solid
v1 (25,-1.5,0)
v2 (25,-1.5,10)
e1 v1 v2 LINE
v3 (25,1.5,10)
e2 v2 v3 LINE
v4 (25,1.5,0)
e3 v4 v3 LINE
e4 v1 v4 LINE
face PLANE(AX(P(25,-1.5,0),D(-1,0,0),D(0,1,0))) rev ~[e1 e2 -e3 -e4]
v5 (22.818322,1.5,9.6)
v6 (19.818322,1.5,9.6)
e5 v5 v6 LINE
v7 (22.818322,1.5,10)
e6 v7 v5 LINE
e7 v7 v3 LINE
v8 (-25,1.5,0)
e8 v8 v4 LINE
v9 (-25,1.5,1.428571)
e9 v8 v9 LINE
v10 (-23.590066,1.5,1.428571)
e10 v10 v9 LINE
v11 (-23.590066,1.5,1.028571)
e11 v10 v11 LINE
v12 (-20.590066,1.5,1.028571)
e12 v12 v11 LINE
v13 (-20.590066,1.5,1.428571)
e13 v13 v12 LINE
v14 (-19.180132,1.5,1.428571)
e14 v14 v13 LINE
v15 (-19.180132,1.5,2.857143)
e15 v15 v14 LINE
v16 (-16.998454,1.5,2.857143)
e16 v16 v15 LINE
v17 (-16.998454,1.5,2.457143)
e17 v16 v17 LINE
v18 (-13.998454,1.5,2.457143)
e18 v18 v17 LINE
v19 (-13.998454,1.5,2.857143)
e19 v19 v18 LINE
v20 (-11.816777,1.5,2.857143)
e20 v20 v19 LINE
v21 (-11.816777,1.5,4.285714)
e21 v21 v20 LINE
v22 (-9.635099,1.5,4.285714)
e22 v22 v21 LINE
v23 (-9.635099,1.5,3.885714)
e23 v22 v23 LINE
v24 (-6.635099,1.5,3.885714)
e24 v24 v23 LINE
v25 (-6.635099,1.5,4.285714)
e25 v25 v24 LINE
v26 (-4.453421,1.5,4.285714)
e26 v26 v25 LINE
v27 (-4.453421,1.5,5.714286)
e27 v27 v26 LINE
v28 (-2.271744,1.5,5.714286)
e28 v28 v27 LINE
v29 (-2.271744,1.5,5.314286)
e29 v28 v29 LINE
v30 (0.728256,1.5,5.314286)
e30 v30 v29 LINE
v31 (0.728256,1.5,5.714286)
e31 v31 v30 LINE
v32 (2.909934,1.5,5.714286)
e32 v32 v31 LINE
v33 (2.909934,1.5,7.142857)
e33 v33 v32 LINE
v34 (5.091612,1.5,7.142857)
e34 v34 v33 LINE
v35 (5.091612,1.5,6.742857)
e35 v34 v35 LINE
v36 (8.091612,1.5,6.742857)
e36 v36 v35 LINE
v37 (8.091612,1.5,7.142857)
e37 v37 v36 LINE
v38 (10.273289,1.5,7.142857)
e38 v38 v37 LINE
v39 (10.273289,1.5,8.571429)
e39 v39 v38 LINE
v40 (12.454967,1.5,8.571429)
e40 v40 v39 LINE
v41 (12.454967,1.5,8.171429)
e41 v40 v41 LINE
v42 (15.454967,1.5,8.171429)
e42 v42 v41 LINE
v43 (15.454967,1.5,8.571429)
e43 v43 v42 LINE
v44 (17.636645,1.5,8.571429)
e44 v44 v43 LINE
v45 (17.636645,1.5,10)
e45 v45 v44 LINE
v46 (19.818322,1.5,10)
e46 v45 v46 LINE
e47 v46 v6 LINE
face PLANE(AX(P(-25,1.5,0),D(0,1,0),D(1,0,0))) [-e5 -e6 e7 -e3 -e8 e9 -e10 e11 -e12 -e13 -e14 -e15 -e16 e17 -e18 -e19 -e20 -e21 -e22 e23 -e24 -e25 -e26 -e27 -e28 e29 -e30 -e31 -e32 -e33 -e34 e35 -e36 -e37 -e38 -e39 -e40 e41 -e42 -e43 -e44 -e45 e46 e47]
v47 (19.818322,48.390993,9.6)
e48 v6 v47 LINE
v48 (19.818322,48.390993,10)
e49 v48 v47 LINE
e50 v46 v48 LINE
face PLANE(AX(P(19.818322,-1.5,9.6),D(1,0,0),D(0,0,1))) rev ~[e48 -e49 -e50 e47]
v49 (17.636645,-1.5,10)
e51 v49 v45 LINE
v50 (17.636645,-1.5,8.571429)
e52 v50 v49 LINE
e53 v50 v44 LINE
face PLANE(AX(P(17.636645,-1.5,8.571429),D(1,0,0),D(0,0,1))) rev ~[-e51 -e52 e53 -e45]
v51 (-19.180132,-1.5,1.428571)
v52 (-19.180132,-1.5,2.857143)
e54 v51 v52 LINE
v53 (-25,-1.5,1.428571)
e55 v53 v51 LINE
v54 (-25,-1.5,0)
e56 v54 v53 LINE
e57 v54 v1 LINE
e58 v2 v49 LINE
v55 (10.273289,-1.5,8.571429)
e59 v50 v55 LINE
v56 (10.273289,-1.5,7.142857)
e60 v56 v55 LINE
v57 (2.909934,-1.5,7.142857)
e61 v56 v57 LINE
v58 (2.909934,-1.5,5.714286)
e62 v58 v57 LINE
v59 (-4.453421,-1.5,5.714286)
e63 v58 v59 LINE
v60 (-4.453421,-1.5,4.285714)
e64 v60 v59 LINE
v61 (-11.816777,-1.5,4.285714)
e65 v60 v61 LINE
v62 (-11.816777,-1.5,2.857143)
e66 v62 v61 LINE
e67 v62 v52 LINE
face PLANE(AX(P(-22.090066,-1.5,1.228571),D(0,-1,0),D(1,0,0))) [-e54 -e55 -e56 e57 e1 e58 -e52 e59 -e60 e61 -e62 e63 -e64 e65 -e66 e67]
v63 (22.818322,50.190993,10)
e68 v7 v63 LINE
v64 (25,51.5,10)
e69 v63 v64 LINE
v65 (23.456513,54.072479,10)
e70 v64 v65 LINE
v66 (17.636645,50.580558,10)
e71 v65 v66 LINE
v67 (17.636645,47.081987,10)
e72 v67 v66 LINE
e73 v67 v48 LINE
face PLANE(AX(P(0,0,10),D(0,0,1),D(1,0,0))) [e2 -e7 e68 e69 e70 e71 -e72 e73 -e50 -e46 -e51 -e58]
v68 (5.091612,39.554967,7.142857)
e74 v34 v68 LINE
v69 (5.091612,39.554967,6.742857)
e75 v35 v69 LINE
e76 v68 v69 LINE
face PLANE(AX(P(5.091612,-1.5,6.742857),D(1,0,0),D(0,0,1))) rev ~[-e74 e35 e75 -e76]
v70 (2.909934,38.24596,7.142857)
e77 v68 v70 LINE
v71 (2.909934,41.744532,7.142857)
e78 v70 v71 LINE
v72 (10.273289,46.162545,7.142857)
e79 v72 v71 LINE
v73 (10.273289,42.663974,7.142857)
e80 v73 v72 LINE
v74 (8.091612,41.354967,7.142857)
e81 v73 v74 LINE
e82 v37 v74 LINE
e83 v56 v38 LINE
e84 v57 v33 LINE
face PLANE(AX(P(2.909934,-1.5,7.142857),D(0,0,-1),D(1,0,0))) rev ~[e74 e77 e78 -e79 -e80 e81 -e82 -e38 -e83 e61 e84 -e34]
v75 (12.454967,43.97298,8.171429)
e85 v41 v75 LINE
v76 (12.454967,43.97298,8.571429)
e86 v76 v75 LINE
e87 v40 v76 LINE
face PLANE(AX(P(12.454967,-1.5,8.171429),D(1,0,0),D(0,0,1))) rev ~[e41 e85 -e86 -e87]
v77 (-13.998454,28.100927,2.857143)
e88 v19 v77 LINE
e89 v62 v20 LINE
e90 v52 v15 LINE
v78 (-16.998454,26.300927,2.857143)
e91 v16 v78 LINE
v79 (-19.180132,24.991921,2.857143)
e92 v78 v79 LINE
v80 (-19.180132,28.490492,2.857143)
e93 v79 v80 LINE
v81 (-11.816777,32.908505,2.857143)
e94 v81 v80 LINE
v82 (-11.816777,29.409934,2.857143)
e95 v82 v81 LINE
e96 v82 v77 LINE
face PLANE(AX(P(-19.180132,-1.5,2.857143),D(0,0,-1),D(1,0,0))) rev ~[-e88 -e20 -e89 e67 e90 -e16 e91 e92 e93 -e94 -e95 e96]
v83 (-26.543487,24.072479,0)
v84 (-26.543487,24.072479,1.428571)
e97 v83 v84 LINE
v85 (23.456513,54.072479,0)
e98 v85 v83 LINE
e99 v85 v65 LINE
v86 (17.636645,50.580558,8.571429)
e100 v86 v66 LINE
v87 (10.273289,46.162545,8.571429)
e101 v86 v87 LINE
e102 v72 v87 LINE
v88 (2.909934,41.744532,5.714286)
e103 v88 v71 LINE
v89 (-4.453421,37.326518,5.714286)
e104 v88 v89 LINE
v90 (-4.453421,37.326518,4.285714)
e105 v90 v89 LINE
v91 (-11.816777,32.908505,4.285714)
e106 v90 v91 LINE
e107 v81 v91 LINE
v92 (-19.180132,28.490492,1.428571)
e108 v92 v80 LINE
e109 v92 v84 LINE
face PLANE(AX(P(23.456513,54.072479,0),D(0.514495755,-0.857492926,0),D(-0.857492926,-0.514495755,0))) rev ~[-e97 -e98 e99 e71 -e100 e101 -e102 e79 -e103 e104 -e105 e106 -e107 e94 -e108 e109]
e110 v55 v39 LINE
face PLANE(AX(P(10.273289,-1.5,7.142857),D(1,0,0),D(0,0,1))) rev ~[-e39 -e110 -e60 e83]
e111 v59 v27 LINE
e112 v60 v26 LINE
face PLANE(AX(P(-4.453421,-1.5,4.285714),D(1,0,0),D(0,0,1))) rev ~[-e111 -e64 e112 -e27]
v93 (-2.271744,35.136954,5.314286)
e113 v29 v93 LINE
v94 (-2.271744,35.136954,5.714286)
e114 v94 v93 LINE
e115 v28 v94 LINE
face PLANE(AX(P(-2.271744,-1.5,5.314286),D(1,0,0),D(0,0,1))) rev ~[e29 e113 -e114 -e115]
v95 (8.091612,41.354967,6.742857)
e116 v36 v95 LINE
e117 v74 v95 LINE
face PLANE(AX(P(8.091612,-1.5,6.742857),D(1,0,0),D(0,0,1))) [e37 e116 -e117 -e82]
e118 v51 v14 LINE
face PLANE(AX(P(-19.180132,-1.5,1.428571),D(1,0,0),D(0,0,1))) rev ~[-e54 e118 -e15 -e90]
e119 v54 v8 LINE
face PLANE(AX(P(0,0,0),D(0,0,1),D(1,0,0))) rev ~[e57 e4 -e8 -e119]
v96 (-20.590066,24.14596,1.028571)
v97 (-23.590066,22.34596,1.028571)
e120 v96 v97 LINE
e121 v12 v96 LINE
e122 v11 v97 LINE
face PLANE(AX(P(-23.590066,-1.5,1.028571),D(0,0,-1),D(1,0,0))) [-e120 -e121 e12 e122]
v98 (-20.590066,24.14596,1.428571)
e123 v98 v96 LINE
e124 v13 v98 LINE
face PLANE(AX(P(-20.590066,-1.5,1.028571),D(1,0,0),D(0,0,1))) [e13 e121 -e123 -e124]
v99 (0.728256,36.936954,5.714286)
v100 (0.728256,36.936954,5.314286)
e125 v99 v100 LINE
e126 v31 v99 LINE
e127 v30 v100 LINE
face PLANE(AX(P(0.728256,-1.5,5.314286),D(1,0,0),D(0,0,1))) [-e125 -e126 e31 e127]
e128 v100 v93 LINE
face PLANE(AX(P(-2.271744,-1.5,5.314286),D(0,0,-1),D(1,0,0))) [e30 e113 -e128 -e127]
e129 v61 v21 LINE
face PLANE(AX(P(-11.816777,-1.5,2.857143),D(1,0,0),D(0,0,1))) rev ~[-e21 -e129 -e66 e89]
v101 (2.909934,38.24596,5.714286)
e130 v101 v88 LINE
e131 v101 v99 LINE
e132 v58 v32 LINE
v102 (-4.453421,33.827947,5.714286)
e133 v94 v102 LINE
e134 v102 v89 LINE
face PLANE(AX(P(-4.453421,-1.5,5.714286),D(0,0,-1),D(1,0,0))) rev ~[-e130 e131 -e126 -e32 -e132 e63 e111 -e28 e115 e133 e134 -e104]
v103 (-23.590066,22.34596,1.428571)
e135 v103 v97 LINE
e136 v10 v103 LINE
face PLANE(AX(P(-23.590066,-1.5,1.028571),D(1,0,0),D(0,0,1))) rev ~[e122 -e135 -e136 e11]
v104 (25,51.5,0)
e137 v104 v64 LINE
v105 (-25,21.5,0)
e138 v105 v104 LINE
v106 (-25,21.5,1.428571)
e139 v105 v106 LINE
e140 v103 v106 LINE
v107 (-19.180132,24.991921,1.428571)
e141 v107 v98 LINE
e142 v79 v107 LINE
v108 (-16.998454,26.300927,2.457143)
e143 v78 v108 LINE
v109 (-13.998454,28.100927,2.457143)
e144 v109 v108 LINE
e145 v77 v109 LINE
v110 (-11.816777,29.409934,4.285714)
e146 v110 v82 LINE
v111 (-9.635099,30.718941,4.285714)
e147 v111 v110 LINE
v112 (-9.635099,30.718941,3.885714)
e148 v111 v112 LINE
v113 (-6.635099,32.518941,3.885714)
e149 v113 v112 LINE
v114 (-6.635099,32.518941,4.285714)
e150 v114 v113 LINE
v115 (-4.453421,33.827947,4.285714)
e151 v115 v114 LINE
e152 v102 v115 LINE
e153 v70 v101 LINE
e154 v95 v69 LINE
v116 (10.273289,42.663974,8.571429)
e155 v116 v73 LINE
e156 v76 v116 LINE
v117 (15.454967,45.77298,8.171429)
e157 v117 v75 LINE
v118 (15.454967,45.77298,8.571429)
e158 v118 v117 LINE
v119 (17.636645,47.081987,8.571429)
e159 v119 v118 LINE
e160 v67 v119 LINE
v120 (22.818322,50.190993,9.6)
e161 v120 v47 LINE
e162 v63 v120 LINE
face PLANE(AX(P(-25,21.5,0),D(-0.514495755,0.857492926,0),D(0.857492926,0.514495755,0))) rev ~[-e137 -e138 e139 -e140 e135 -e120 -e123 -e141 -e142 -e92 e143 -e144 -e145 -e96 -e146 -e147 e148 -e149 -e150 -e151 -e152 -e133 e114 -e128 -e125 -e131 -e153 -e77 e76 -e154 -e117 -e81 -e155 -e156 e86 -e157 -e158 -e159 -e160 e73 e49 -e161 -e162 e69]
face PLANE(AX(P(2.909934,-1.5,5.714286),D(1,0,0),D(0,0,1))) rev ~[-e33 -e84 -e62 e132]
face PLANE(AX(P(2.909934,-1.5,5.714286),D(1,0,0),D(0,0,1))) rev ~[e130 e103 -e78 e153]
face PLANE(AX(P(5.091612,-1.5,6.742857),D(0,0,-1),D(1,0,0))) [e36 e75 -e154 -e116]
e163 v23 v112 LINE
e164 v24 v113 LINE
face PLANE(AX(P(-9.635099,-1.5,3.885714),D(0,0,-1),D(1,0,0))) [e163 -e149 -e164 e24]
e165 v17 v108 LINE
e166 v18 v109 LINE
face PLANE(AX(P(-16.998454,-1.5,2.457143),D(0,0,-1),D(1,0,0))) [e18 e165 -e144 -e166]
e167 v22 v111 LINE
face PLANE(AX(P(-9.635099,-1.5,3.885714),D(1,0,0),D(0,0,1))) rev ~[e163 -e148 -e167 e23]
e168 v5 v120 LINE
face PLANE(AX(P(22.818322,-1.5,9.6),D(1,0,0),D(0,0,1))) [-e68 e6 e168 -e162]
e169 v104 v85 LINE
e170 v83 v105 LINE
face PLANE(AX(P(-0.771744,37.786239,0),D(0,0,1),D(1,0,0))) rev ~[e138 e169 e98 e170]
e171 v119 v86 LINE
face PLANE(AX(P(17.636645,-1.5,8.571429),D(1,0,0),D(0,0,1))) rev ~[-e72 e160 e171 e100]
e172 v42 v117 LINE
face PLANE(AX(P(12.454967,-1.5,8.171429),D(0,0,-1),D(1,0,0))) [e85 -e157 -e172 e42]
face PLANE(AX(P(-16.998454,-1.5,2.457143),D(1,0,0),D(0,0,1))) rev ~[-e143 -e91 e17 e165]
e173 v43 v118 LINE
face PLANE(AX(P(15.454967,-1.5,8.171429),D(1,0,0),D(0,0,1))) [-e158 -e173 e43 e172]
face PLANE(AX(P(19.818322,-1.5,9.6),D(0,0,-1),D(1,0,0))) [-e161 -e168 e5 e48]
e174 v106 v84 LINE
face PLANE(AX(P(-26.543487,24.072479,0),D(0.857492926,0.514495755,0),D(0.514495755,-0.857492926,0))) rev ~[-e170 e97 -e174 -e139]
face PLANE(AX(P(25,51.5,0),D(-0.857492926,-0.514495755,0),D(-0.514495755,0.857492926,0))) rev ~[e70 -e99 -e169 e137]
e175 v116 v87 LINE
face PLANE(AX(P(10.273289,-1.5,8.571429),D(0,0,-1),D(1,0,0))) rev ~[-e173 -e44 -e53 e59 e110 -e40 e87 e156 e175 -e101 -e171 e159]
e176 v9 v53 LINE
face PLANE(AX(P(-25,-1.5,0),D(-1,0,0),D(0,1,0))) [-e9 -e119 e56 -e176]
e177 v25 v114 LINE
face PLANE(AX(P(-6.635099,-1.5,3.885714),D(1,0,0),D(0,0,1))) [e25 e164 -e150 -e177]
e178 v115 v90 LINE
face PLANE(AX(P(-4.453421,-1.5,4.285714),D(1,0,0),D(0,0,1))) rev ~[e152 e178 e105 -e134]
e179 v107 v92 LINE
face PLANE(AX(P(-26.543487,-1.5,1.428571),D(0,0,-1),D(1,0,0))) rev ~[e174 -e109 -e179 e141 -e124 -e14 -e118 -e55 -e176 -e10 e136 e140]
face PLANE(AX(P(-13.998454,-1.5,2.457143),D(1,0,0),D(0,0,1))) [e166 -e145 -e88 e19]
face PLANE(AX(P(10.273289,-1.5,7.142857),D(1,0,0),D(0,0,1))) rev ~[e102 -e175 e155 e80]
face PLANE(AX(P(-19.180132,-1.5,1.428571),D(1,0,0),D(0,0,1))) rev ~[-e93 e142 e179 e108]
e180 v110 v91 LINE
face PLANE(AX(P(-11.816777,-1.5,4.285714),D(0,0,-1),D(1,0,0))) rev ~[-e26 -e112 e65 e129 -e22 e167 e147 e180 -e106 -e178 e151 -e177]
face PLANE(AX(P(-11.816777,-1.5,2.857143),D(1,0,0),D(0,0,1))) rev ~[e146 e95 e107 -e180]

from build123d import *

# Parameters (mm, degrees)
F0_W     = 50
F0_H     = 3
F1_DEPTH = 10
F3_DEPTH = 55.5734787771
F4_W     = 3
F4_H     = 0.4
F5_REACH = 58.6000279672


with BuildPart() as f1:
    # F0 (on Top) → F1 (new body)
    with BuildSketch(Plane.XY):
        Rectangle(F0_W, F0_H)
    extrude(amount=F1_DEPTH)


with BuildPart() as f1b:
    # F0 (on Top) → F1, piece 2 (new body)
    with BuildSketch(Plane.XY):
        Polygon((-26.5434872663, 24.0724787771), (-25, 21.5), (25, 51.5), (23.4565127337, 54.0724787771), align=None)
    extrude(amount=F1_DEPTH)


with BuildPart() as f3_tool:
    # F2 (on face) → F3 (new body, through all)
    with BuildSketch(Plane.XZ.offset(1.5)):
        Polygon((17.6366446762, 10), (-26.5434872663, 10), (-26.5434872663, 1.4285714286), (-19.1801319425, 1.4285714286), (-19.1801319425, 2.8571428571), (-11.8167766188, 2.8571428571), (-11.8167766188, 4.2857142857), (-4.453421295, 4.2857142857), (-4.453421295, 5.7142857143), (2.9099340287, 5.7142857143), (2.9099340287, 7.1428571429), (10.2732893525, 7.1428571429), (10.2732893525, 8.5714285714), (17.6366446762, 8.5714285714), align=None)
    extrude(amount=-F3_DEPTH)


with BuildPart() as f1_1:
    add(f1.part)

    # F3: cut by f3_tool
    add(f3_tool.part, mode=Mode.SUBTRACT)



with BuildPart() as f1b_1:
    add(f1b.part)

    # F3: cut by f3_tool
    add(f3_tool.part, mode=Mode.SUBTRACT)


with BuildPart() as f1_2:
    add(f1_1.part)

    add(f1b_1.part)  # F5 merges F1b
    f5_end = f1_2.faces().sort_by_distance((5.616262324, 43.3683285313, 3.4924250952))[0]
    # F4 (on face) → F5 (join, up to a face of the model that its end follows)
    with BuildSketch(Plane.XZ.offset(1.5)):
        with Locations((-22.0900659713, 1.2285714286)):
            Rectangle(F4_W, F4_H)
        with Locations((-15.4984542807, 2.6571428571)):
            Rectangle(F4_W, F4_H)
        with Locations((-8.1350989569, 4.0857142857)):
            Rectangle(F4_W, F4_H)
        with Locations((-0.7717436331, 5.5142857143)):
            Rectangle(F4_W, F4_H)
        with Locations((6.5916116906, 6.9428571429)):
            Rectangle(F4_W, F4_H)
        with Locations((13.9549670144, 8.3714285714)):
            Rectangle(F4_W, F4_H)
        with Locations((21.3183223381, 9.8)):
            Rectangle(F4_W, F4_H)
    f5_long = extrude(amount=-F5_REACH, mode=Mode.PRIVATE)
    add(split(f5_long, bisect_by=f5_end, keep=Keep.BOTTOM, mode=Mode.PRIVATE))


solid = f1_2.part
